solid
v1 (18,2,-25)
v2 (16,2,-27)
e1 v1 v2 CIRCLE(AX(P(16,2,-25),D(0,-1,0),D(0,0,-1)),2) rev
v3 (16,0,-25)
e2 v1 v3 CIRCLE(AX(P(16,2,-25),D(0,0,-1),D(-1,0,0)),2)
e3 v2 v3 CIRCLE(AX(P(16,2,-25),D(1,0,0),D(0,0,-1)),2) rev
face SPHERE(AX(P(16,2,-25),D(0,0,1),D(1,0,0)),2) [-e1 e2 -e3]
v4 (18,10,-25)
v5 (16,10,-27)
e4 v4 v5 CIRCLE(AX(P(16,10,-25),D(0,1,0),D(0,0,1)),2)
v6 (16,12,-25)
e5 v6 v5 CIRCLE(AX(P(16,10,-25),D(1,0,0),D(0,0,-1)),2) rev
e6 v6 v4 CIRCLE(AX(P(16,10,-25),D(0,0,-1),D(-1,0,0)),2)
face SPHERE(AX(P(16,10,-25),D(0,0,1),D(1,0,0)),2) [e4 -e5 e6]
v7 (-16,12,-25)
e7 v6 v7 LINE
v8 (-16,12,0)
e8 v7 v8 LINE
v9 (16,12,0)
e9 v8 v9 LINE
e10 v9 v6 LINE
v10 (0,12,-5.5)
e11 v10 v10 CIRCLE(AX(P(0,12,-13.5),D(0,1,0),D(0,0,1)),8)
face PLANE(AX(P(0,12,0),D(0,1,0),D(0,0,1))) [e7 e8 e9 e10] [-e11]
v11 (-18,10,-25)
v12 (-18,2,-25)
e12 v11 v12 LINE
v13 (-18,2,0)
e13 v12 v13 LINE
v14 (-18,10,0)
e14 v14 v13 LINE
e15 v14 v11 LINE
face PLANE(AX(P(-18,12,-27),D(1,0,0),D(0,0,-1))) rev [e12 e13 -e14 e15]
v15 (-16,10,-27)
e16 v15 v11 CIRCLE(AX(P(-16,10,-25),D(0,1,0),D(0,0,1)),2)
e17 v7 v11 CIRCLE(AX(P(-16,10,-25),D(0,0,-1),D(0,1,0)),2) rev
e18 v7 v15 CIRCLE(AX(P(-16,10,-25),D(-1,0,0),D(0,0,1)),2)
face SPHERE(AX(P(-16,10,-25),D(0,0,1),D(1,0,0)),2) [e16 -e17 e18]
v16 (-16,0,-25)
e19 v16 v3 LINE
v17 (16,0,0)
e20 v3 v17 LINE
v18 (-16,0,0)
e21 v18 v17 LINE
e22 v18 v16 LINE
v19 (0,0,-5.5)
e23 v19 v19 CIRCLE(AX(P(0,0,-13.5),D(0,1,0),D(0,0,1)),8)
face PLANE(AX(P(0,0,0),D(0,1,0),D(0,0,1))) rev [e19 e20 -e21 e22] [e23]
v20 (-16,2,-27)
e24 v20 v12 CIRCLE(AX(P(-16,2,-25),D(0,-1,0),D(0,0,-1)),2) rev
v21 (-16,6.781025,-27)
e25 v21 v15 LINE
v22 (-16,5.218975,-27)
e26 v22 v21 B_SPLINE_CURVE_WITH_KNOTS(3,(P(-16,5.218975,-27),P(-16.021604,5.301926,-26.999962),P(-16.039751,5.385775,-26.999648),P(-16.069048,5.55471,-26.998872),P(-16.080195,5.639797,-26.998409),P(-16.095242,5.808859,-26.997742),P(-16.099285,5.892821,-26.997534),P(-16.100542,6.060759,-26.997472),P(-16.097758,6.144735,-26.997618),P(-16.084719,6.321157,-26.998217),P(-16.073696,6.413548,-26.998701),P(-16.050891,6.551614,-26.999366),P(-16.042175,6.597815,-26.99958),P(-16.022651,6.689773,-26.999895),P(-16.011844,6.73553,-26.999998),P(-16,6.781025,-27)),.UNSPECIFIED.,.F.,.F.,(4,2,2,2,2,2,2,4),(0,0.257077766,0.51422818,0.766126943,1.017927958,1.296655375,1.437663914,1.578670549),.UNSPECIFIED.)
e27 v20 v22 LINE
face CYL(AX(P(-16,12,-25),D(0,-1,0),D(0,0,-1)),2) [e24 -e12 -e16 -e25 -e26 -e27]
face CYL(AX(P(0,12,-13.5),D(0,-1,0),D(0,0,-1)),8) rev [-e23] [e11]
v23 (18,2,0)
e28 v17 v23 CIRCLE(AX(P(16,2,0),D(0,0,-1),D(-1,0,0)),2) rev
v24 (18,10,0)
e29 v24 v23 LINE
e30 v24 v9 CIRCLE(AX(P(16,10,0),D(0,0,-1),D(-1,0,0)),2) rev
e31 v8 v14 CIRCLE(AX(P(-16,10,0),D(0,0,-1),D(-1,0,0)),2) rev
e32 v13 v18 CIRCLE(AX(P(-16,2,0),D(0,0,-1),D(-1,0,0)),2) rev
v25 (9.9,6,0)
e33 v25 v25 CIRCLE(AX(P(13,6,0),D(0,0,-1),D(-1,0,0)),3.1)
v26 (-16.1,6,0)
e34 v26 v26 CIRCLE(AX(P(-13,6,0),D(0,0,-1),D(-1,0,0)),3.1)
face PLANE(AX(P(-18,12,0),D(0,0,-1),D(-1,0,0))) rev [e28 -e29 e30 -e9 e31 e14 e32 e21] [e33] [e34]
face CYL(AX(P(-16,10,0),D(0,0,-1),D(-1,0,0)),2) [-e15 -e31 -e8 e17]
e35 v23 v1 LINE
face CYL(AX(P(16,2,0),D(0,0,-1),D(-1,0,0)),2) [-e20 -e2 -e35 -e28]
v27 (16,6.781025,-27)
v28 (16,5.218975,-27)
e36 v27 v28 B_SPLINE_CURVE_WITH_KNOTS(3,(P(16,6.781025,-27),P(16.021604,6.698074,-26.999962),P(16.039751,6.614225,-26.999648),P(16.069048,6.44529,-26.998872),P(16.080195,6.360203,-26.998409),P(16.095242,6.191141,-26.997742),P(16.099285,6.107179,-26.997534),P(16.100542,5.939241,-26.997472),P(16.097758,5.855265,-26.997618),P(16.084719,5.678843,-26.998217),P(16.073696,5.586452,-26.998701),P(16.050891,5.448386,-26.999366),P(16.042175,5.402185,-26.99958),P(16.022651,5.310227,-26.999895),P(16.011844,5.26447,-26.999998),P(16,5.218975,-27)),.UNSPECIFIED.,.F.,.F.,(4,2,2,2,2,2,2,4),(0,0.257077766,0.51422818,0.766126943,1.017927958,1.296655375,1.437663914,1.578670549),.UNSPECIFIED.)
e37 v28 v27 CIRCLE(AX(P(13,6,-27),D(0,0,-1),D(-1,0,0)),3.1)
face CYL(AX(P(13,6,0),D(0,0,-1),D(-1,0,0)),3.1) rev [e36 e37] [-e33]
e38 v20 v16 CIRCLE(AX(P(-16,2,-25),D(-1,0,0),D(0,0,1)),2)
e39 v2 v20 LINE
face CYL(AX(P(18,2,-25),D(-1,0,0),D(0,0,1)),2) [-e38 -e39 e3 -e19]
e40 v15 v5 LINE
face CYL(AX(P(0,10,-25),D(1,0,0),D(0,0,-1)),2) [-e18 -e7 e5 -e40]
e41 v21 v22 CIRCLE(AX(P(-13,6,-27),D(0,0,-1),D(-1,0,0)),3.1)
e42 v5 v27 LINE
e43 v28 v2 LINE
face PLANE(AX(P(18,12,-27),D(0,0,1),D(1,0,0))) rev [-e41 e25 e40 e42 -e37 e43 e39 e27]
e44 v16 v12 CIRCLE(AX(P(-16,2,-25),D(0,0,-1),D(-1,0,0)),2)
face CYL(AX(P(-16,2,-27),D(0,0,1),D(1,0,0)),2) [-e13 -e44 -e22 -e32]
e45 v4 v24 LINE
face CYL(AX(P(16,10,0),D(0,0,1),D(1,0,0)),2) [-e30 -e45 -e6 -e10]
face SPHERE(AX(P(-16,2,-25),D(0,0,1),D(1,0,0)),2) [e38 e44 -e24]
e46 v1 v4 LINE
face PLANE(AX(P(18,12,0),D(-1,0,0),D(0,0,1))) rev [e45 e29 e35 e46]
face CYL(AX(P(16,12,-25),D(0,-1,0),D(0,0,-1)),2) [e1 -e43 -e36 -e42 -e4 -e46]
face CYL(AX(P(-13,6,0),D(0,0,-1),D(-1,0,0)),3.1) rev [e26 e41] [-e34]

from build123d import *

# Parameters (mm, degrees)
SKETCH1_W           = 36
SKETCH1_H           = 27
SKETCH1_R           = 8
BOSS_EXTRUDE1_DEPTH = 12
SKETCH3_R           = 3.1
CUT_EXTRUDE1_DEPTH  = 35.597687784
FILLET1_R           = 2


with BuildPart() as part:
    # Sketch1 → Boss-Extrude1 (new body)
    with BuildSketch(Plane(origin=(0, 0, 0), x_dir=(1, 0, 0), z_dir=(0, 1, 0))):
        with Locations((0, 13.5)):
            Rectangle(SKETCH1_W, SKETCH1_H)
        with Locations(Location((0, 13.5, 0), (0, 0, 270))):
            Circle(SKETCH1_R, mode=Mode.SUBTRACT)
    extrude(amount=BOSS_EXTRUDE1_DEPTH)

    # Sketch3 → Cut-Extrude1 (cut, through all)
    with BuildSketch(Plane(origin=(0, 0, -27), x_dir=(-1, 0, 0), z_dir=(0, 0, -1))):
        with Locations((13, 6)):
            Circle(SKETCH3_R)
        with Locations((-13, 6)):
            Circle(SKETCH3_R)
    extrude(amount=-CUT_EXTRUDE1_DEPTH, mode=Mode.SUBTRACT)

    # Fillet1
    # the kernel refuses this fillet: 2 mm, written as the material it takes off along each edge
    with BuildSketch(Plane(origin=(16, 10, -25), x_dir=(1, 0, 0), z_dir=(0, 1, 0))) as fillet1_piece_1_section:
        Polygon((0, 0), (FILLET1_R, 0), (FILLET1_R, FILLET1_R), (0, FILLET1_R), align=None)
    fillet1_piece_1 = extrude(amount=FILLET1_R, mode=Mode.PRIVATE)
    fillet1_piece_1 = fillet1_piece_1 - Plane(origin=(16, 10, -25), x_dir=(-0.7071067811865476, 0, 0.7071067811865475), z_dir=(0, 1, 0)) * Sphere(FILLET1_R, mode=Mode.PRIVATE)
    add(fillet1_piece_1, mode=Mode.SUBTRACT)
    with BuildSketch(Plane(origin=(-16, 10, -25), x_dir=(0, 1, 0), z_dir=(-1, 0, 0))) as fillet1_piece_2_section:
        Polygon((0, 0), (FILLET1_R, 0), (FILLET1_R, FILLET1_R), (0, FILLET1_R), align=None)
    fillet1_piece_2 = extrude(amount=FILLET1_R, mode=Mode.PRIVATE)
    fillet1_piece_2 = fillet1_piece_2 - Plane(origin=(-16, 10, -25), x_dir=(0, -0.7071067811865475, 0.7071067811865475), z_dir=(-1, 0, 0)) * Sphere(FILLET1_R, mode=Mode.PRIVATE)
    add(fillet1_piece_2, mode=Mode.SUBTRACT)
    with BuildSketch(Plane(origin=(16, 2, -25), x_dir=(1, 0, 0), z_dir=(0, -1, 0))) as fillet1_piece_3_section:
        Polygon((0, 0), (FILLET1_R, 0), (FILLET1_R, -FILLET1_R), (0, -FILLET1_R), align=None)
    fillet1_piece_3 = extrude(amount=FILLET1_R, mode=Mode.PRIVATE)
    fillet1_piece_3 = fillet1_piece_3 - Plane(origin=(16, 2, -25), x_dir=(-0.7071067811865476, 0, 0.7071067811865475), z_dir=(0, -1, 0)) * Sphere(FILLET1_R, mode=Mode.PRIVATE)
    add(fillet1_piece_3, mode=Mode.SUBTRACT)
    with BuildSketch(Plane(origin=(-16, 2, -25), x_dir=(0, -1, 0), z_dir=(-1, 0, 0))) as fillet1_piece_4_section:
        Polygon((0, 0), (FILLET1_R, 0), (FILLET1_R, -FILLET1_R), (0, -FILLET1_R), align=None)
    fillet1_piece_4 = extrude(amount=FILLET1_R, mode=Mode.PRIVATE)
    fillet1_piece_4 = fillet1_piece_4 - Plane(origin=(-16, 2, -25), x_dir=(0, 0.7071067811865475, 0.7071067811865475), z_dir=(-1, 0, 0)) * Sphere(FILLET1_R, mode=Mode.PRIVATE)
    add(fillet1_piece_4, mode=Mode.SUBTRACT)
    with BuildSketch(Plane(origin=(18, 12, 5), x_dir=(-1, 0, 0), z_dir=(0, 0, -1)), Plane(origin=(-18, 0, -25), x_dir=(0, 1, 0), z_dir=(0, 0, 1))) as fillet1_piece_5:
        with BuildLine():
            CenterArc((FILLET1_R, -FILLET1_R), FILLET1_R, 90, 90)
            Line((0, -FILLET1_R), (0, 0))
            Line((0, 0), (FILLET1_R, 0))
        make_face()
    extrude(amount=30, mode=Mode.SUBTRACT)
    with BuildSketch(Plane(origin=(16, 12, -27), x_dir=(0, 0, 1), z_dir=(-1, 0, 0))) as fillet1_piece_6:
        with BuildLine():
            CenterArc((FILLET1_R, -FILLET1_R), FILLET1_R, 90, 90)
            Line((0, -FILLET1_R), (0, 0))
            Line((0, 0), (FILLET1_R, 0))
        make_face()
    extrude(amount=32, mode=Mode.SUBTRACT)
    with BuildSketch(Plane(origin=(-18, 12, -25), x_dir=(0, -1, 0), z_dir=(0, 0, 1)), Plane(origin=(18, 0, 5), x_dir=(-1, 0, 0), z_dir=(0, 0, -1))) as fillet1_piece_7:
        with BuildLine():
            CenterArc((FILLET1_R, FILLET1_R), FILLET1_R, 180, 90)
            Line((0, FILLET1_R), (0, 0))
            Line((0, 0), (FILLET1_R, 0))
        make_face()
    extrude(amount=30, mode=Mode.SUBTRACT)
    with BuildSketch(Plane(origin=(16, 0, -27), x_dir=(0, 0, 1), z_dir=(-1, 0, 0))) as fillet1_piece_8:
        with BuildLine():
            CenterArc((FILLET1_R, FILLET1_R), FILLET1_R, 180, 90)
            Line((0, FILLET1_R), (0, 0))
            Line((0, 0), (FILLET1_R, 0))
        make_face()
    extrude(amount=32, mode=Mode.SUBTRACT)
    with BuildSketch(Plane(origin=(-18, 2, -27), x_dir=(0, 0, 1), z_dir=(0, 1, 0))) as fillet1_piece_9:
        with BuildLine():
            CenterArc((FILLET1_R, FILLET1_R), FILLET1_R, 180, 90)
            Line((0, FILLET1_R), (0, 0))
            Line((0, 0), (FILLET1_R, 0))
        make_face()
    extrude(amount=8, mode=Mode.SUBTRACT)
    with BuildSketch(Plane(origin=(18, 2, -27), x_dir=(0, 0, 1), z_dir=(0, 1, 0))) as fillet1_piece_10:
        with BuildLine():
            CenterArc((FILLET1_R, -FILLET1_R), FILLET1_R, 90, 90)
            Line((0, -FILLET1_R), (0, 0))
            Line((0, 0), (FILLET1_R, 0))
        make_face()
    extrude(amount=8, mode=Mode.SUBTRACT)


solid = part.part
